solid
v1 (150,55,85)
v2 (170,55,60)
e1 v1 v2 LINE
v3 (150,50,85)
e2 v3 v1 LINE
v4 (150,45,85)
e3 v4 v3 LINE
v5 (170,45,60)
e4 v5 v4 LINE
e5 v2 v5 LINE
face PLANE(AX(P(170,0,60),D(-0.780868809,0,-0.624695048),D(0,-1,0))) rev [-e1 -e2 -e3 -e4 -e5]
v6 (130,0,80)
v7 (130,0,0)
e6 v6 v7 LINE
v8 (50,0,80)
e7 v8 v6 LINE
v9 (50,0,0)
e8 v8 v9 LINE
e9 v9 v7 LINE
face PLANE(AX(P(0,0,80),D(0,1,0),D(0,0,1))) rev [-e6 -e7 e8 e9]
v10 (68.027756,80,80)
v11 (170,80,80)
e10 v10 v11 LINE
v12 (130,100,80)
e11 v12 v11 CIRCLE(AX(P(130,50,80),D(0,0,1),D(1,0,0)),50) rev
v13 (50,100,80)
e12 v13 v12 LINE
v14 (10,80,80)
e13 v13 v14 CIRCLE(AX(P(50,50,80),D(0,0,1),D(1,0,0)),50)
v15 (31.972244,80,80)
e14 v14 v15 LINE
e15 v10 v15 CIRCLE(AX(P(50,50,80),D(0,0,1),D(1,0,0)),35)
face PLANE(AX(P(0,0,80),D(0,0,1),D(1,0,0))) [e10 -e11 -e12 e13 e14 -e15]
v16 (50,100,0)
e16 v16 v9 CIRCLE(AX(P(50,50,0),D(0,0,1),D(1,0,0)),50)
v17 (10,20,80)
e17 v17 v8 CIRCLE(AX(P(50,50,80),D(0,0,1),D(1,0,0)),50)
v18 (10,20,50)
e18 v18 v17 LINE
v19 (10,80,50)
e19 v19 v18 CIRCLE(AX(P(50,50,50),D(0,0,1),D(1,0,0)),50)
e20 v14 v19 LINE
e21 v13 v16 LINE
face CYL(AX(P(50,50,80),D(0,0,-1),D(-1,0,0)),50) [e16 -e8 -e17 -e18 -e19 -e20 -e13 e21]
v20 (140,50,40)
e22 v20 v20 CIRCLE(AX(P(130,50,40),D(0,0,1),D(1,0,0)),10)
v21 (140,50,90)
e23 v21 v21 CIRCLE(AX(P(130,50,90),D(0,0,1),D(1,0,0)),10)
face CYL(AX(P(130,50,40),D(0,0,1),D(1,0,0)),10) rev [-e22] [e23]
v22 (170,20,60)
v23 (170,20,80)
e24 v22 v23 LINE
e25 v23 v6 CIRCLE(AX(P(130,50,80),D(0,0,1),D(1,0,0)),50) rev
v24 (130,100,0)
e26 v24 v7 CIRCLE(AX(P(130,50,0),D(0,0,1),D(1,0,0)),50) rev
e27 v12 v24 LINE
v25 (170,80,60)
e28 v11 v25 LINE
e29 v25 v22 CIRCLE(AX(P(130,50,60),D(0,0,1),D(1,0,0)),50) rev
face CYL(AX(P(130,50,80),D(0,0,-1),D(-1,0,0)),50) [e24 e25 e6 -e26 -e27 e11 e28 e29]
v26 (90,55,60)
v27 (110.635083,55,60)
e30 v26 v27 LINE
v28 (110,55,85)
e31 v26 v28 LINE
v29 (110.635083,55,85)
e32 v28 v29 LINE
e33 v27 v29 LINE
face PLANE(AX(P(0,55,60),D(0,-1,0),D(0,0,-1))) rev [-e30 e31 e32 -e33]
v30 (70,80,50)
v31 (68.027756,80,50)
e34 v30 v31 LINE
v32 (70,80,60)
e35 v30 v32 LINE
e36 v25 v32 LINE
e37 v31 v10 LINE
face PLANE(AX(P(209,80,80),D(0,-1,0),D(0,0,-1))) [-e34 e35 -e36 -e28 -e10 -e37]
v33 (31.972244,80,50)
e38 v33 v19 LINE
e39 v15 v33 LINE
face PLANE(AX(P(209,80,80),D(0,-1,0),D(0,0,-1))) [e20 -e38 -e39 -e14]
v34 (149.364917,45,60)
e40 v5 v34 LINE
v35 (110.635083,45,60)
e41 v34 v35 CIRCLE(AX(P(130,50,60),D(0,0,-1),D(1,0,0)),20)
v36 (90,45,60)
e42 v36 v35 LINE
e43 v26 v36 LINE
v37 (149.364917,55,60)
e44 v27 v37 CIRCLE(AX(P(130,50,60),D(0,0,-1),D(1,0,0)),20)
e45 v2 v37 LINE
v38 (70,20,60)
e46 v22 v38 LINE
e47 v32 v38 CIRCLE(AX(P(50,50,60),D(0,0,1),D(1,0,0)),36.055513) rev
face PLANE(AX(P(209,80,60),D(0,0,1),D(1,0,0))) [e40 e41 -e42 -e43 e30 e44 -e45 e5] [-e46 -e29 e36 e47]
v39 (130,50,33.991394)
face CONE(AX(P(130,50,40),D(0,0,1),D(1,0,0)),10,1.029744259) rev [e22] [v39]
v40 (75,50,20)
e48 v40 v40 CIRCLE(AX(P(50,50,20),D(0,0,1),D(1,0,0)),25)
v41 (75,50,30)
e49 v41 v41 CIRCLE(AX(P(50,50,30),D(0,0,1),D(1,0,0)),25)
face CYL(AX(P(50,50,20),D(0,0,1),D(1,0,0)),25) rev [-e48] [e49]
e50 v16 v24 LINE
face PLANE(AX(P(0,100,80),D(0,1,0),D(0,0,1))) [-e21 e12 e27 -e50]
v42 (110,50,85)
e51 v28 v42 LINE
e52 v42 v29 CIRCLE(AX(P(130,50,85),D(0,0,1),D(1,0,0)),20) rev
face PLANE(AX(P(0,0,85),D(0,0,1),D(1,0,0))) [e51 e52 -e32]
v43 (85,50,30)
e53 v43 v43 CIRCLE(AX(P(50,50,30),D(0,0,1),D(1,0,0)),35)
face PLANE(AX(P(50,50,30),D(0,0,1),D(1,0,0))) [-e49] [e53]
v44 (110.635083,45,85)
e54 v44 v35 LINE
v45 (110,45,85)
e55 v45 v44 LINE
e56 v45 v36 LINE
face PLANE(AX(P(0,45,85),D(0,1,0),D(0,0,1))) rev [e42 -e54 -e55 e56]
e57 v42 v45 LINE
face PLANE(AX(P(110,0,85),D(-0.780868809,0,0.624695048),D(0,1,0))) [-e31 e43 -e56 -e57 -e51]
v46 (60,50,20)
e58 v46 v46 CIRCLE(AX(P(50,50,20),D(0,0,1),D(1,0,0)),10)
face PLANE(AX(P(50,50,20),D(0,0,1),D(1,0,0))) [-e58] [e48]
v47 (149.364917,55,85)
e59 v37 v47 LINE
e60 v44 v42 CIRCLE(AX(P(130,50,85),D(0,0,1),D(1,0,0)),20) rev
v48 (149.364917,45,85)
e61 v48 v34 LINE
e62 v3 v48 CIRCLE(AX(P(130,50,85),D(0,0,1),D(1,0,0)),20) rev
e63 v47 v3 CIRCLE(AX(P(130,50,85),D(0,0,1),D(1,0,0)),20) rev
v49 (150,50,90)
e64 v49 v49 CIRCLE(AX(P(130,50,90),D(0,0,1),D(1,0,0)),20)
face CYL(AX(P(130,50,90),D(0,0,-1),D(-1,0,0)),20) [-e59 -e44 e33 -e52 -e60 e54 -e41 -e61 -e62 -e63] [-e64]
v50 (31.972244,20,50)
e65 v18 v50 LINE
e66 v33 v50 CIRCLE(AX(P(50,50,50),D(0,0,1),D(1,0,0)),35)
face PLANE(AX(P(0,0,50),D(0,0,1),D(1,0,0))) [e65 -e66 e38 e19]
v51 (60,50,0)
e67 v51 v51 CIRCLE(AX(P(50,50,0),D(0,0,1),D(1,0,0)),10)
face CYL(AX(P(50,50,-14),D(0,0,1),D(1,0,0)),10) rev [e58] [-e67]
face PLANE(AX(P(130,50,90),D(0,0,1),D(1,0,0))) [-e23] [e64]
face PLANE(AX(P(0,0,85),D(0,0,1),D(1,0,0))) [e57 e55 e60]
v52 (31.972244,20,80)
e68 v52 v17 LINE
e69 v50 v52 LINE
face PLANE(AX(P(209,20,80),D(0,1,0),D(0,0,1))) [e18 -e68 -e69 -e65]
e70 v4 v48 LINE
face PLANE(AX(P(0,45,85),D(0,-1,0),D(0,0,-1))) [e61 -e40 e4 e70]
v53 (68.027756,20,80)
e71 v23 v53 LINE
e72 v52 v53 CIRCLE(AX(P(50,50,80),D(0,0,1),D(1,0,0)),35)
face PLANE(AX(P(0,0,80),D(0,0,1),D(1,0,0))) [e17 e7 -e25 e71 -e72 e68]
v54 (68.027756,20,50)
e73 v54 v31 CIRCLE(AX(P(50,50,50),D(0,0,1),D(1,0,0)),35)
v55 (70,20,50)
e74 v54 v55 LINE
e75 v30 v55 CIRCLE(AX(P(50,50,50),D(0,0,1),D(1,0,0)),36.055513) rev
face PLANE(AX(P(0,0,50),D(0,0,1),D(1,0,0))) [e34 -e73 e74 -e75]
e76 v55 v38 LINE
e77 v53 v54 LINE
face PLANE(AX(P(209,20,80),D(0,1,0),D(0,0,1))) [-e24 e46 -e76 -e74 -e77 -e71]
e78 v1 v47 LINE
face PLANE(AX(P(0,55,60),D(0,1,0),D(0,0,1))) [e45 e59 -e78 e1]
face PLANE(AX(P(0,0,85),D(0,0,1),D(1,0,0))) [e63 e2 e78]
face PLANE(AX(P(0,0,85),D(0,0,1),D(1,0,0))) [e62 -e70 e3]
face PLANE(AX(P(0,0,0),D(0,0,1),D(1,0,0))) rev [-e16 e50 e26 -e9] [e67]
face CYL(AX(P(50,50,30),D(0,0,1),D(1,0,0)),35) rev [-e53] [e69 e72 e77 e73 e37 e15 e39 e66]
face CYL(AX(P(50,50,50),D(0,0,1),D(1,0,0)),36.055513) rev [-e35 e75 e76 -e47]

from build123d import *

# Parameters (mm, degrees)
BOSS_EXTRUDE1_DEPTH        = 80
SKETCH2_W                  = 20
SKETCH2_H                  = 10
CUT_EXTRUDE1_DEPTH         = 209
SKETCH3_R                  = 10
CUT_EXTRUDE2_DEPTH         = 40
BOSS_EXTRUDE2_START        = 10
SKETCH4_R                  = 20
SKETCH4_R_2                = 10
BOSS_EXTRUDE2_DEPTH        = 10
F_20_0MM_DOWEL_HOLE1_D     = 20
F_20_0MM_DOWEL_HOLE1_DEPTH = 50
F_20_0MM_DOWEL_HOLE1_TIP   = 6.00860619
CUT_EXTRUDE3_DEPTH         = 20
SKETCH10_R                 = 10
CUT_EXTRUDE4_DEPTH         = 74
SKETCH11_R                 = 25
SKETCH11_R_2               = 10
CUT_EXTRUDE5_DEPTH         = 40
SKETCH12_R                 = 25
CUT_EXTRUDE6_DEPTH         = 10
SKETCH14_R                 = 35
SKETCH14_R_2               = 25
CUT_EXTRUDE7_DEPTH         = 30
SKETCH15_R                 = 35
CUT_EXTRUDE8_DEPTH         = 30
CUT_EXTRUDE9_DEPTH         = 20
BOSS_EXTRUDE3_START        = 25
SKETCH17_W                 = 20
SKETCH17_H                 = 5
BOSS_EXTRUDE3_DEPTH        = 25
SKETCH18_W                 = 20
SKETCH18_H                 = 5
BOSS_EXTRUDE4_DEPTH        = 25
SKETCH19_W                 = 20
SKETCH19_H                 = 5
BOSS_EXTRUDE5_DEPTH        = 25
CHAMFER1_SIZE2             = 20
CHAMFER1_SIZE              = 25
CHAMFER3_SIZE2             = 25
CHAMFER3_SIZE              = 20


with BuildPart() as part:
    # Sketch1 → Boss-Extrude1 (new body)
    with BuildSketch(Plane.XY):
        with BuildLine():
            ThreePointArc((0, 50), (14.644660941, 14.644660941), (50, 0))
            Line((50, 0), (130, 0))
            ThreePointArc((130, 0), (165.355339059, 14.644660941), (180, 50))
            ThreePointArc((180, 50), (165.355339059, 85.355339059), (130, 100))
            Line((130, 100), (50, 100))
            ThreePointArc((50, 100), (14.644660941, 85.355339059), (0, 50))
        make_face()
    extrude(amount=BOSS_EXTRUDE1_DEPTH)

    # Sketch2 → Cut-Extrude1 (cut)
    with BuildSketch(Plane(origin=(0, 0, 0), x_dir=(0, 0, -1), z_dir=(1, 0, 0))):
        with Locations((-70, 75)):
            Rectangle(SKETCH2_W, SKETCH2_H)
        with Locations((-70, 25)):
            Rectangle(SKETCH2_W, SKETCH2_H)
    extrude(amount=CUT_EXTRUDE1_DEPTH, mode=Mode.SUBTRACT)

    # Sketch3 → Cut-Extrude2 (cut)
    with BuildSketch(Plane.XY.offset(80)):
        with Locations((130, 50)):
            Circle(SKETCH3_R)
    extrude(amount=-CUT_EXTRUDE2_DEPTH, mode=Mode.SUBTRACT)

    # Sketch4 → Boss-Extrude2 (add)
    with BuildSketch(Plane.XY.offset(80).offset(BOSS_EXTRUDE2_START)):
        with Locations(Location((130, 50, 0), (0, 0, 270))):
            Circle(SKETCH4_R)
        with Locations((130, 50)):
            Circle(SKETCH4_R_2, mode=Mode.SUBTRACT)
    extrude(amount=-BOSS_EXTRUDE2_DEPTH)

    # Ø20.0mm Dowel Hole1
    with Locations(Plane(origin=(130, 50, 90), x_dir=(1, 0, 0), z_dir=(0, 0, 1))):
        with Locations((0, 0)):
            Hole(F_20_0MM_DOWEL_HOLE1_D / 2, depth=F_20_0MM_DOWEL_HOLE1_DEPTH)
            with Locations((0, 0, -(F_20_0MM_DOWEL_HOLE1_DEPTH + F_20_0MM_DOWEL_HOLE1_TIP / 2))):  # 118° drill point
                Cone(0, F_20_0MM_DOWEL_HOLE1_D / 2, F_20_0MM_DOWEL_HOLE1_TIP, mode=Mode.SUBTRACT)

    # Sketch9 → Cut-Extrude3 (cut)
    with BuildSketch(Plane.XY.offset(80)):
        with BuildLine():
            Line((130, 70), (4.17424305, 70))
            ThreePointArc((4.17424305, 70), (0, 50), (4.17424305, 30))
            Line((4.17424305, 30), (130, 30))
            ThreePointArc((130, 30), (110, 50), (130, 70))
        make_face()
    extrude(amount=-CUT_EXTRUDE3_DEPTH, mode=Mode.SUBTRACT)

    # Sketch10 → Cut-Extrude4 (cut)
    with BuildSketch(Plane.XY.offset(60)):
        with Locations((50, 50)):
            Circle(SKETCH10_R)
    extrude(amount=-CUT_EXTRUDE4_DEPTH, mode=Mode.SUBTRACT)

    # Sketch11 → Cut-Extrude5 (cut)
    with BuildSketch(Plane.XY.offset(60)):
        with Locations((50, 50)):
            Circle(SKETCH11_R)
        with Locations((50, 50)):
            Circle(SKETCH11_R_2, mode=Mode.SUBTRACT)
    extrude(amount=-CUT_EXTRUDE5_DEPTH, mode=Mode.SUBTRACT)

    # Sketch12 → Cut-Extrude6 (cut)
    with BuildSketch(Plane.XY.offset(60)):
        with BuildLine():
            Line((70, 80), (10, 80))
            ThreePointArc((10, 80), (0, 50), (10, 20))
            Line((10, 20), (70, 20))
            ThreePointArc((70, 20), (86.055512755, 50), (70, 80))
        make_face()
        with Locations((50, 50)):
            Circle(SKETCH12_R, mode=Mode.SUBTRACT)
    extrude(amount=-CUT_EXTRUDE6_DEPTH, mode=Mode.SUBTRACT)

    # Sketch14 → Cut-Extrude7 (cut)
    with BuildSketch(Plane.XY.offset(60)):
        with Locations((50, 50)):
            Circle(SKETCH14_R)
        with Locations((50, 50)):
            Circle(SKETCH14_R_2, mode=Mode.SUBTRACT)
    extrude(amount=-CUT_EXTRUDE7_DEPTH, mode=Mode.SUBTRACT)

    # Sketch15 → Cut-Extrude8 (cut)
    with BuildSketch(Plane.XY.offset(80)):
        with Locations((50, 50)):
            Circle(SKETCH15_R)
    extrude(amount=-CUT_EXTRUDE8_DEPTH, mode=Mode.SUBTRACT)

    # Sketch16 → Cut-Extrude9 (cut)
    with BuildSketch(Plane.XY.offset(80)):
        with BuildLine():
            Line((130, 70), (175.82575695, 70))
            ThreePointArc((175.82575695, 70), (180, 50), (175.82575695, 30))
            Line((175.82575695, 30), (130, 30))
            ThreePointArc((130, 30), (150, 50), (130, 70))
        make_face()
    extrude(amount=-CUT_EXTRUDE9_DEPTH, mode=Mode.SUBTRACT)

    # Sketch17 → Boss-Extrude3 (add)
    with BuildSketch(Plane.XY.offset(60).offset(BOSS_EXTRUDE3_START)):
        with BuildLine():
            Line((150, 45), (150, 50))
            ThreePointArc((150, 50), (149.840593925, 47.47991415), (149.364916731, 45))
            Line((149.364916731, 45), (150, 45))
        make_face()
        with Locations((160, 47.5)):
            Rectangle(SKETCH17_W, SKETCH17_H)
        with BuildLine():
            ThreePointArc((110.635083269, 45), (110.159406075, 47.47991415), (110, 50))
            Line((110, 50), (110, 45))
            Line((110, 45), (110.635083269, 45))
        make_face()
        with Locations((100, 47.5)):
            Rectangle(SKETCH17_W, SKETCH17_H)
    extrude(amount=-BOSS_EXTRUDE3_DEPTH)

    # Sketch18 → Boss-Extrude4 (add)
    with BuildSketch(Plane.XY.offset(85)):
        with BuildLine():
            ThreePointArc((110.635083269, 55), (110.159406075, 52.52008585), (110, 50))
            Line((110, 50), (110, 55))
            Line((110, 55), (110.635083269, 55))
        make_face()
        with Locations((100, 52.5)):
            Rectangle(SKETCH18_W, SKETCH18_H)
    extrude(amount=-BOSS_EXTRUDE4_DEPTH)

    # Sketch19 → Boss-Extrude5 (add)
    with BuildSketch(Plane.XY.offset(85)):
        with BuildLine():
            Line((150, 55), (149.364916731, 55))
            ThreePointArc((149.364916731, 55), (149.840593925, 52.52008585), (150, 50))
            Line((150, 50), (150, 55))
        make_face()
        with Locations((160, 52.5)):
            Rectangle(SKETCH19_W, SKETCH19_H)
    extrude(amount=-BOSS_EXTRUDE5_DEPTH)

    # Chamfer1
    chamfer1_edges = [part.edges().sort_by_distance(p)[0] for p in [
        (90, 52.5, 85),
    ]]
    chamfer1_side = [part.faces().sort_by_distance(p)[0] for p in [
        (90, 52.5, 84.6),
    ]]
    chamfer(chamfer1_edges, length=CHAMFER1_SIZE - 0.0001, length2=CHAMFER1_SIZE2 - 0.0001, reference=chamfer1_side[0])  # a hair under: the kernel refuses the full size

    # Chamfer3
    chamfer3_edges = [part.edges().sort_by_distance(p)[0] for p in [
        (170, 52.5, 85),
    ]]
    chamfer3_side = [part.faces().sort_by_distance(p)[0] for p in [
        (169.6, 52.5, 85),
    ]]
    chamfer(chamfer3_edges, length=CHAMFER3_SIZE - 0.0001, length2=CHAMFER3_SIZE2 - 0.0001, reference=chamfer3_side[0])  # a hair under: the kernel refuses the full size


solid = part.part
